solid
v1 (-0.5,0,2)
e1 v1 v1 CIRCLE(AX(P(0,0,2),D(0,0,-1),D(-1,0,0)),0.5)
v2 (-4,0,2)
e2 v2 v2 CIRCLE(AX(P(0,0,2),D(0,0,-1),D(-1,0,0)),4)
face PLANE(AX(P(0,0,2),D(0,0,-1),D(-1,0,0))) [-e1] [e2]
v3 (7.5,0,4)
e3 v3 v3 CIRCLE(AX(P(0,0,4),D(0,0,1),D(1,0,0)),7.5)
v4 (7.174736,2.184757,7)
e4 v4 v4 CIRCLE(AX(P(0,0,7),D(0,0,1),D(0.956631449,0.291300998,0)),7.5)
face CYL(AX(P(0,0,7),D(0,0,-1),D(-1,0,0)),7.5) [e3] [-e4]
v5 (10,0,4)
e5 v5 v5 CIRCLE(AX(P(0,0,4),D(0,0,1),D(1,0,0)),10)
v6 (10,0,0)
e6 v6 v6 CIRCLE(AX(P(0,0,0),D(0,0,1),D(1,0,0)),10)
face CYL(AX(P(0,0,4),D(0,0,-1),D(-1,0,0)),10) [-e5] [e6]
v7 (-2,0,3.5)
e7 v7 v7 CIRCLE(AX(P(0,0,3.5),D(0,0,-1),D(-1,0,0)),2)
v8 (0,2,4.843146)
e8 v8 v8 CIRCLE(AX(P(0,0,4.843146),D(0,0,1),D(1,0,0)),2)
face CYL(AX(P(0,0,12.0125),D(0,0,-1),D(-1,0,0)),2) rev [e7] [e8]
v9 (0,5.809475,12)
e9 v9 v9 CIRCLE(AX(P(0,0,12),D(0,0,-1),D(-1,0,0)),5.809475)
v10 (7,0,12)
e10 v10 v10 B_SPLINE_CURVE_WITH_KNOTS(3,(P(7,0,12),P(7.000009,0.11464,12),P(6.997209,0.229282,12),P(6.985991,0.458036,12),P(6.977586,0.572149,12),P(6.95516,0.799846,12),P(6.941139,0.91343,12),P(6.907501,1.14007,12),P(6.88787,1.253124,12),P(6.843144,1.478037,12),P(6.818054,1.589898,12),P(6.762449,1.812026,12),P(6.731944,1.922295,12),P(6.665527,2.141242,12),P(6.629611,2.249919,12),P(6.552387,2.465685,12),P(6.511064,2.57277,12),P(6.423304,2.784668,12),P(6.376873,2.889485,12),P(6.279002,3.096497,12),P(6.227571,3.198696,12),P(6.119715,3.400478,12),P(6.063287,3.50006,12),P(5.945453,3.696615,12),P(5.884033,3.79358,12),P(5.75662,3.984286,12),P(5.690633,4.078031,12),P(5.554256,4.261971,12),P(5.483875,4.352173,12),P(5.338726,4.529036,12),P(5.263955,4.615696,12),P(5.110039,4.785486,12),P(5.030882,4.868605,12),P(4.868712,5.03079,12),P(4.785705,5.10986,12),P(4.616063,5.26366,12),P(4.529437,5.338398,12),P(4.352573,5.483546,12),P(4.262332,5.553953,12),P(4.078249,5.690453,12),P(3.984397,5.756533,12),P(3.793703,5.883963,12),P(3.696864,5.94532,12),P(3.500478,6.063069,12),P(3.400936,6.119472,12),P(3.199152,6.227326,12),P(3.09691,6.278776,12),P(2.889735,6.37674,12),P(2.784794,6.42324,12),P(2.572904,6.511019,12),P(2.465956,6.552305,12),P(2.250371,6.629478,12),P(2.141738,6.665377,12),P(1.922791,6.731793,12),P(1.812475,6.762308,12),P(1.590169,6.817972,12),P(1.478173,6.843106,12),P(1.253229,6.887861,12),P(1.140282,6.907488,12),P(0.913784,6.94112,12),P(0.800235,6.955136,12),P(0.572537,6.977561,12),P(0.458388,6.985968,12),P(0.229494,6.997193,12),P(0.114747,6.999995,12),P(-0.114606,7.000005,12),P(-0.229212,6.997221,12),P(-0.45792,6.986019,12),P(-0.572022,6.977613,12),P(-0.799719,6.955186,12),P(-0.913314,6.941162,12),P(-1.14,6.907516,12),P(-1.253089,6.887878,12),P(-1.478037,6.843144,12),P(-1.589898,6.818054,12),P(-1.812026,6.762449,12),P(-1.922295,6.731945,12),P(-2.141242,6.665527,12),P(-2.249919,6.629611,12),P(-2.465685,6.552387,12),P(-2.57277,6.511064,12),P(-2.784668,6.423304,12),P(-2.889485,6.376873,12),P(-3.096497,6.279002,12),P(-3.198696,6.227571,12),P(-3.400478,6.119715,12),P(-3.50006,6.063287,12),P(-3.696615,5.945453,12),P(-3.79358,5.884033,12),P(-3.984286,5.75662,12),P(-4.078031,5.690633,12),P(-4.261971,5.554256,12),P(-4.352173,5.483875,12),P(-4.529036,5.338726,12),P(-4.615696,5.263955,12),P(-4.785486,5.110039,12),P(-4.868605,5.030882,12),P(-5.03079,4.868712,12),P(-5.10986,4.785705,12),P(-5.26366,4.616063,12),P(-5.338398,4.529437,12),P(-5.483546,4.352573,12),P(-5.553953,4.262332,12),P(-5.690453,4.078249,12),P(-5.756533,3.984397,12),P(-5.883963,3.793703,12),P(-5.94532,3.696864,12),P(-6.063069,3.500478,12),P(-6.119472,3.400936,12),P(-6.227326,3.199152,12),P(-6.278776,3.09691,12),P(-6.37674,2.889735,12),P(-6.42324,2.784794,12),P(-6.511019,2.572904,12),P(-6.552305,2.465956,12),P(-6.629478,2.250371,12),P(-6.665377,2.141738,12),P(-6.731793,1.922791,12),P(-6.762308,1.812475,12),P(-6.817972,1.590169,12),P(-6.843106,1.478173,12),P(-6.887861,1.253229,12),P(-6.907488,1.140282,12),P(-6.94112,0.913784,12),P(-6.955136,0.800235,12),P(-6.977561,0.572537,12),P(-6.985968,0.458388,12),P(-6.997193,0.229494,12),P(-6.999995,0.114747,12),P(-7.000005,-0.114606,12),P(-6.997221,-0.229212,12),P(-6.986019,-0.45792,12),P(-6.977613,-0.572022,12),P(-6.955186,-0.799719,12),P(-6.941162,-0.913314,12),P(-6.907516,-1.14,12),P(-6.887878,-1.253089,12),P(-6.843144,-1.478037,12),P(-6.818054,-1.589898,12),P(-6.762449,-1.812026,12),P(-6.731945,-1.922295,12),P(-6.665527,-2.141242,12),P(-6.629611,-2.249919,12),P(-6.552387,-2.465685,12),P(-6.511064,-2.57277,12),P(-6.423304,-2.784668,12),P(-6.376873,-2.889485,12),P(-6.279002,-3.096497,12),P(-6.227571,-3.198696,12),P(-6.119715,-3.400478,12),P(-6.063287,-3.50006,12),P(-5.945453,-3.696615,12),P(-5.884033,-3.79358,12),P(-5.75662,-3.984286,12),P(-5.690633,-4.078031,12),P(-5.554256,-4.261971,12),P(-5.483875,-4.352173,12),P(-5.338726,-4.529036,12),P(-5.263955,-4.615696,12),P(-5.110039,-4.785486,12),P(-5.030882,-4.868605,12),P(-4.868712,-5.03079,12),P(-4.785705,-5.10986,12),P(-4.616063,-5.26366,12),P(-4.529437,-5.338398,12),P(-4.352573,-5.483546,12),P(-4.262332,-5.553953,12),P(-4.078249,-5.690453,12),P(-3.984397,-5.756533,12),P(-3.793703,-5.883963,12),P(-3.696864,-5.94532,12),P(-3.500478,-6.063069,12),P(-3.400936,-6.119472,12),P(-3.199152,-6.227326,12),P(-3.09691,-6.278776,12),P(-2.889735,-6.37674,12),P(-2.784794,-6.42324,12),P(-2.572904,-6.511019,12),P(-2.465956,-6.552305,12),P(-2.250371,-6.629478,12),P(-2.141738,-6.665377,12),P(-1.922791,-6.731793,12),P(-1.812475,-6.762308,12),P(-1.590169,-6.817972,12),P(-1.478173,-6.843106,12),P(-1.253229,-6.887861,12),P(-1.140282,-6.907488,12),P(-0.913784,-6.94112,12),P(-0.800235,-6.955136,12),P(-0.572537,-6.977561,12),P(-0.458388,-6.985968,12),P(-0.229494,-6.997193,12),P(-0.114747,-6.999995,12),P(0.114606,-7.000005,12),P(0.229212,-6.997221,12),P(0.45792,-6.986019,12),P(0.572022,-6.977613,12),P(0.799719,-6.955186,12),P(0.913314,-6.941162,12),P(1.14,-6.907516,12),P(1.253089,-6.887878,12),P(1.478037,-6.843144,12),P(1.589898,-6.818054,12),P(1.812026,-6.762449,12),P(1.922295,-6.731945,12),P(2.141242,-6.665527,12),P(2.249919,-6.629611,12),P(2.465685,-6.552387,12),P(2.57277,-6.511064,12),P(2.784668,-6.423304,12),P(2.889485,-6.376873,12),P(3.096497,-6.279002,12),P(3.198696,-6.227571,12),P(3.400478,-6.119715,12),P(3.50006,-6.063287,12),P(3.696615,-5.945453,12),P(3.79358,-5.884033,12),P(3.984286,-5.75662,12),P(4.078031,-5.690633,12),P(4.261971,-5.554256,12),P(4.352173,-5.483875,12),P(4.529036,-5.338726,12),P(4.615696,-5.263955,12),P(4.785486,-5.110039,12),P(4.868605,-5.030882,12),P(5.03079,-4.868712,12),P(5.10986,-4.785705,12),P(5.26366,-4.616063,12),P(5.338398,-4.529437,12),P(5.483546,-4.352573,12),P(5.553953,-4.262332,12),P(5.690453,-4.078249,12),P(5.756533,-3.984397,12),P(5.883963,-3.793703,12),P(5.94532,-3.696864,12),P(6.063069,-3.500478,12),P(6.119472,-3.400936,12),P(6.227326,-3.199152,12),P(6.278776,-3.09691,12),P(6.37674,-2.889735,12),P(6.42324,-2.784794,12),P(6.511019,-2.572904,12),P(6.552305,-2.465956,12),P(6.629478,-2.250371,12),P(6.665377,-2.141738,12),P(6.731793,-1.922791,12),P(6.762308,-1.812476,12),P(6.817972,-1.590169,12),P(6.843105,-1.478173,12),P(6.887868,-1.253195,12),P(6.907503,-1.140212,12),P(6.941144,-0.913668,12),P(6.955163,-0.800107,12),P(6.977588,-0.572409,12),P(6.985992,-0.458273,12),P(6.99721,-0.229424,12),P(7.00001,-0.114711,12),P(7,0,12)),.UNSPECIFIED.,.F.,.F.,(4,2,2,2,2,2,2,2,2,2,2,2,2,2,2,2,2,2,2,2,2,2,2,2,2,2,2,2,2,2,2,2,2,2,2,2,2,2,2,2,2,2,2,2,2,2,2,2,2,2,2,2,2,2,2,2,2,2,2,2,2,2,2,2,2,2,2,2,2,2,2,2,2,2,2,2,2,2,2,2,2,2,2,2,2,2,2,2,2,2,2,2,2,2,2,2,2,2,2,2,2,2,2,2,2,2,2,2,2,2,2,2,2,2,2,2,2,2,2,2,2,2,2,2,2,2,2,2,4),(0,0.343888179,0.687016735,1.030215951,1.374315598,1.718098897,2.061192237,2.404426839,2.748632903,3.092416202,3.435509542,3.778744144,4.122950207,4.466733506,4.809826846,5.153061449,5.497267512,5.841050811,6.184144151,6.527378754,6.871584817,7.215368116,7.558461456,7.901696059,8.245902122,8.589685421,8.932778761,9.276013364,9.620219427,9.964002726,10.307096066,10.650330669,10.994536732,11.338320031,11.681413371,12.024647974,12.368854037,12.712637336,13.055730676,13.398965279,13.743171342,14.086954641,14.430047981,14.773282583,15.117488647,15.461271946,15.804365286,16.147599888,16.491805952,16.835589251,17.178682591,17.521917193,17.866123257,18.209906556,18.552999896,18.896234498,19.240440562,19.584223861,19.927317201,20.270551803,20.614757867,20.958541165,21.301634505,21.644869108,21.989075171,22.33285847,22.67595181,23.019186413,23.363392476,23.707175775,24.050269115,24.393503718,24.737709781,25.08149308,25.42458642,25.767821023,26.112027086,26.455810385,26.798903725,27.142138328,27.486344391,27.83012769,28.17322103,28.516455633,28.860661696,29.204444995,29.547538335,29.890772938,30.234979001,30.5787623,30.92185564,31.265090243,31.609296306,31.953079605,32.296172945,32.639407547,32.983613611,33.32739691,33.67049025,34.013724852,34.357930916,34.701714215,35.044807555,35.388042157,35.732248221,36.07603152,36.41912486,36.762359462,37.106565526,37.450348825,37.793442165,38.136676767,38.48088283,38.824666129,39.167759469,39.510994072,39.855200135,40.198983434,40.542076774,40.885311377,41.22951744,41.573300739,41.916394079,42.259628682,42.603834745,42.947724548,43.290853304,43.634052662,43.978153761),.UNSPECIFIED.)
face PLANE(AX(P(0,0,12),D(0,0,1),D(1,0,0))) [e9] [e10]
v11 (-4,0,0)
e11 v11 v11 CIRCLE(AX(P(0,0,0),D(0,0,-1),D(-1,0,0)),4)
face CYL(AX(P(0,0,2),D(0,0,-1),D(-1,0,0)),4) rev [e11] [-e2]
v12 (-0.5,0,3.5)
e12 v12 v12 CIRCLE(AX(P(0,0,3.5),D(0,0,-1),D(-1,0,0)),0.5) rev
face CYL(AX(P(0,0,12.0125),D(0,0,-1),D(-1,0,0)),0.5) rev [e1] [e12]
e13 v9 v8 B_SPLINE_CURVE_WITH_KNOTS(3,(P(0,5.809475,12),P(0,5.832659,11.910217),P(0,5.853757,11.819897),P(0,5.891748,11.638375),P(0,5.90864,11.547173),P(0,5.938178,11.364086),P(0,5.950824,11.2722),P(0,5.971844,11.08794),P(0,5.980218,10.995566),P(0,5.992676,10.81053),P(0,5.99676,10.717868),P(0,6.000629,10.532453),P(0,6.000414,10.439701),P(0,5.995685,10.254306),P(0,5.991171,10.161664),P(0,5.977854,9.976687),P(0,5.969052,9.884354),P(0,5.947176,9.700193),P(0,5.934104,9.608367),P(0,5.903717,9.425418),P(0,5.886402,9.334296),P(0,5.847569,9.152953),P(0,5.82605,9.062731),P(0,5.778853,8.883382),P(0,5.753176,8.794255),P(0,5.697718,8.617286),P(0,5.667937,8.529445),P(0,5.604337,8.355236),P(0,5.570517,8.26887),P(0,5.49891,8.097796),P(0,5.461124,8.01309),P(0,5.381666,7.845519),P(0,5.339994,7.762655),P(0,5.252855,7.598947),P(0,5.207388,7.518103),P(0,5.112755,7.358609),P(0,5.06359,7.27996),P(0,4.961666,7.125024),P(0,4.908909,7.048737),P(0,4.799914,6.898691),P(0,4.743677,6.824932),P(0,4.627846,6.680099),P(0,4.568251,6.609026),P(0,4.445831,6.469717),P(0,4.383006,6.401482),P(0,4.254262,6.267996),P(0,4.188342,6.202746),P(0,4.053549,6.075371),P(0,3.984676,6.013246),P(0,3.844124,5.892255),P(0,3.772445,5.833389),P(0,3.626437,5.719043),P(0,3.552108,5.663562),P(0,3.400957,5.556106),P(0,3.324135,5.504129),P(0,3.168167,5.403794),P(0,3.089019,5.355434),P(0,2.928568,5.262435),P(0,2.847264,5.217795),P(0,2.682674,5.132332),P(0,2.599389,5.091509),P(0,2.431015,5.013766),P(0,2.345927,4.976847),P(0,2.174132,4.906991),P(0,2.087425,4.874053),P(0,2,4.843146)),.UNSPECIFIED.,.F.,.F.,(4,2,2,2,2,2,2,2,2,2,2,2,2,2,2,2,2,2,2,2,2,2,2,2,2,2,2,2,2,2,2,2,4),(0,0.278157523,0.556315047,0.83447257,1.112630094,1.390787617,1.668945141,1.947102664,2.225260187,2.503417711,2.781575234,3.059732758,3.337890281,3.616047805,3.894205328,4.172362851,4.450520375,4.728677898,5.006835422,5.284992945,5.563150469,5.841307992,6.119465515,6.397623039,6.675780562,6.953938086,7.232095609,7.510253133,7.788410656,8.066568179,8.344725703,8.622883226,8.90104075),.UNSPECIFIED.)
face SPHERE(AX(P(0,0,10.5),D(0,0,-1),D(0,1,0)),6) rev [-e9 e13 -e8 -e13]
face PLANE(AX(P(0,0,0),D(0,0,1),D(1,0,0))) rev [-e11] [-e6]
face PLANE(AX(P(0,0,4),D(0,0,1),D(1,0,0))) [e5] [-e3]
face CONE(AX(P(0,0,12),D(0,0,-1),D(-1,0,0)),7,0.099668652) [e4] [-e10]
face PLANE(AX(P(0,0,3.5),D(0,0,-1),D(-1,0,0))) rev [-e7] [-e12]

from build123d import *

# Parameters (mm, degrees)
SKETCH_1_R          = 10
EXTRUDE_1_DEPTH     = 4
SKETCH_3_R          = 7
EXTRUDE_2_DEPTH     = 12
SKETCH_4_R          = 7.5
EXTRUDE_3_DEPTH     = 3
SKETCH_5_R          = 4
CUT_EXTRUDE_1_DEPTH = 2
SKETCH_6_R          = 0.5
CUT_EXTRUDE_2_DEPTH = 18.320508076
CUT_EXTRUDE_START   = -1.5
SKETCH_7_R          = 2
CUT_EXTRUDE_3_DEPTH = 16.820508076


# Read off the part's stored shape, not the designer's step: 边界1
with BuildPart() as part:
    # 草图1 → 凸台-拉伸1 (new body)
    with BuildSketch(Plane.XY):
        Circle(SKETCH_1_R)
    extrude(amount=EXTRUDE_1_DEPTH)

    # 草图3 → 凸台-拉伸2 (add)
    with BuildSketch(Plane.XY):
        Circle(SKETCH_3_R)
    extrude(amount=EXTRUDE_2_DEPTH)

    # 草图4 → 凸台-拉伸3 (add)
    with BuildSketch(Plane.XY.offset(4)):
        Circle(SKETCH_4_R)
    extrude(amount=EXTRUDE_3_DEPTH)

    # 边界1 outline → 边界1 (revolve)
    with BuildSketch(Plane.XZ):
        Polygon((7.5, 7), (7, 12), (7, 7), align=None)
    revolve(axis=Axis((0, 0, 0), (0, 0, 1)))

    # 草图5 → 切除-拉伸1 (cut)
    with BuildSketch(Plane(origin=(0, 0, 0), x_dir=(-1, 0, 0), z_dir=(0, 0, -1))):
        Circle(SKETCH_5_R)
    extrude(amount=-CUT_EXTRUDE_1_DEPTH, mode=Mode.SUBTRACT)

    # 草图6 → 切除-拉伸2 (cut, through all)
    with BuildSketch(Plane(origin=(0, 0, 2), x_dir=(-1, 0, 0), z_dir=(0, 0, -1))):
        Circle(SKETCH_6_R)
    extrude(amount=-CUT_EXTRUDE_2_DEPTH, mode=Mode.SUBTRACT)

    # 草图7 → 切除-拉伸3 (cut, through all)
    with BuildSketch(Plane(origin=(0, 0, 2), x_dir=(-1, 0, 0), z_dir=(0, 0, -1)).offset(CUT_EXTRUDE_START)):
        Circle(SKETCH_7_R)
    extrude(amount=-CUT_EXTRUDE_3_DEPTH, mode=Mode.SUBTRACT)

    # 草图8 → 切除-旋转1 (revolve, cut)
    with BuildSketch(Plane(origin=(0, 0, 0), x_dir=(0, 0, -1), z_dir=(1, 0, 0)), mode=Mode.PRIVATE) as cut_revolve_1_sk:
        with BuildLine():
            Line((-12, 0), (-12, 5.809475019))
            ThreePointArc((-12, 5.809475019), (-6.825765386, 4.74341649), (-4.5, 0))
            Line((-4.5, 0), (-12, 0))
        make_face()
    revolve(cut_revolve_1_sk.sketch.rotate(Axis((0, 0, 12), (0, 0, 1)), 286.935860908), axis=Axis((0, 0, 12), (0, 0, 1)), mode=Mode.SUBTRACT)


solid = part.part
